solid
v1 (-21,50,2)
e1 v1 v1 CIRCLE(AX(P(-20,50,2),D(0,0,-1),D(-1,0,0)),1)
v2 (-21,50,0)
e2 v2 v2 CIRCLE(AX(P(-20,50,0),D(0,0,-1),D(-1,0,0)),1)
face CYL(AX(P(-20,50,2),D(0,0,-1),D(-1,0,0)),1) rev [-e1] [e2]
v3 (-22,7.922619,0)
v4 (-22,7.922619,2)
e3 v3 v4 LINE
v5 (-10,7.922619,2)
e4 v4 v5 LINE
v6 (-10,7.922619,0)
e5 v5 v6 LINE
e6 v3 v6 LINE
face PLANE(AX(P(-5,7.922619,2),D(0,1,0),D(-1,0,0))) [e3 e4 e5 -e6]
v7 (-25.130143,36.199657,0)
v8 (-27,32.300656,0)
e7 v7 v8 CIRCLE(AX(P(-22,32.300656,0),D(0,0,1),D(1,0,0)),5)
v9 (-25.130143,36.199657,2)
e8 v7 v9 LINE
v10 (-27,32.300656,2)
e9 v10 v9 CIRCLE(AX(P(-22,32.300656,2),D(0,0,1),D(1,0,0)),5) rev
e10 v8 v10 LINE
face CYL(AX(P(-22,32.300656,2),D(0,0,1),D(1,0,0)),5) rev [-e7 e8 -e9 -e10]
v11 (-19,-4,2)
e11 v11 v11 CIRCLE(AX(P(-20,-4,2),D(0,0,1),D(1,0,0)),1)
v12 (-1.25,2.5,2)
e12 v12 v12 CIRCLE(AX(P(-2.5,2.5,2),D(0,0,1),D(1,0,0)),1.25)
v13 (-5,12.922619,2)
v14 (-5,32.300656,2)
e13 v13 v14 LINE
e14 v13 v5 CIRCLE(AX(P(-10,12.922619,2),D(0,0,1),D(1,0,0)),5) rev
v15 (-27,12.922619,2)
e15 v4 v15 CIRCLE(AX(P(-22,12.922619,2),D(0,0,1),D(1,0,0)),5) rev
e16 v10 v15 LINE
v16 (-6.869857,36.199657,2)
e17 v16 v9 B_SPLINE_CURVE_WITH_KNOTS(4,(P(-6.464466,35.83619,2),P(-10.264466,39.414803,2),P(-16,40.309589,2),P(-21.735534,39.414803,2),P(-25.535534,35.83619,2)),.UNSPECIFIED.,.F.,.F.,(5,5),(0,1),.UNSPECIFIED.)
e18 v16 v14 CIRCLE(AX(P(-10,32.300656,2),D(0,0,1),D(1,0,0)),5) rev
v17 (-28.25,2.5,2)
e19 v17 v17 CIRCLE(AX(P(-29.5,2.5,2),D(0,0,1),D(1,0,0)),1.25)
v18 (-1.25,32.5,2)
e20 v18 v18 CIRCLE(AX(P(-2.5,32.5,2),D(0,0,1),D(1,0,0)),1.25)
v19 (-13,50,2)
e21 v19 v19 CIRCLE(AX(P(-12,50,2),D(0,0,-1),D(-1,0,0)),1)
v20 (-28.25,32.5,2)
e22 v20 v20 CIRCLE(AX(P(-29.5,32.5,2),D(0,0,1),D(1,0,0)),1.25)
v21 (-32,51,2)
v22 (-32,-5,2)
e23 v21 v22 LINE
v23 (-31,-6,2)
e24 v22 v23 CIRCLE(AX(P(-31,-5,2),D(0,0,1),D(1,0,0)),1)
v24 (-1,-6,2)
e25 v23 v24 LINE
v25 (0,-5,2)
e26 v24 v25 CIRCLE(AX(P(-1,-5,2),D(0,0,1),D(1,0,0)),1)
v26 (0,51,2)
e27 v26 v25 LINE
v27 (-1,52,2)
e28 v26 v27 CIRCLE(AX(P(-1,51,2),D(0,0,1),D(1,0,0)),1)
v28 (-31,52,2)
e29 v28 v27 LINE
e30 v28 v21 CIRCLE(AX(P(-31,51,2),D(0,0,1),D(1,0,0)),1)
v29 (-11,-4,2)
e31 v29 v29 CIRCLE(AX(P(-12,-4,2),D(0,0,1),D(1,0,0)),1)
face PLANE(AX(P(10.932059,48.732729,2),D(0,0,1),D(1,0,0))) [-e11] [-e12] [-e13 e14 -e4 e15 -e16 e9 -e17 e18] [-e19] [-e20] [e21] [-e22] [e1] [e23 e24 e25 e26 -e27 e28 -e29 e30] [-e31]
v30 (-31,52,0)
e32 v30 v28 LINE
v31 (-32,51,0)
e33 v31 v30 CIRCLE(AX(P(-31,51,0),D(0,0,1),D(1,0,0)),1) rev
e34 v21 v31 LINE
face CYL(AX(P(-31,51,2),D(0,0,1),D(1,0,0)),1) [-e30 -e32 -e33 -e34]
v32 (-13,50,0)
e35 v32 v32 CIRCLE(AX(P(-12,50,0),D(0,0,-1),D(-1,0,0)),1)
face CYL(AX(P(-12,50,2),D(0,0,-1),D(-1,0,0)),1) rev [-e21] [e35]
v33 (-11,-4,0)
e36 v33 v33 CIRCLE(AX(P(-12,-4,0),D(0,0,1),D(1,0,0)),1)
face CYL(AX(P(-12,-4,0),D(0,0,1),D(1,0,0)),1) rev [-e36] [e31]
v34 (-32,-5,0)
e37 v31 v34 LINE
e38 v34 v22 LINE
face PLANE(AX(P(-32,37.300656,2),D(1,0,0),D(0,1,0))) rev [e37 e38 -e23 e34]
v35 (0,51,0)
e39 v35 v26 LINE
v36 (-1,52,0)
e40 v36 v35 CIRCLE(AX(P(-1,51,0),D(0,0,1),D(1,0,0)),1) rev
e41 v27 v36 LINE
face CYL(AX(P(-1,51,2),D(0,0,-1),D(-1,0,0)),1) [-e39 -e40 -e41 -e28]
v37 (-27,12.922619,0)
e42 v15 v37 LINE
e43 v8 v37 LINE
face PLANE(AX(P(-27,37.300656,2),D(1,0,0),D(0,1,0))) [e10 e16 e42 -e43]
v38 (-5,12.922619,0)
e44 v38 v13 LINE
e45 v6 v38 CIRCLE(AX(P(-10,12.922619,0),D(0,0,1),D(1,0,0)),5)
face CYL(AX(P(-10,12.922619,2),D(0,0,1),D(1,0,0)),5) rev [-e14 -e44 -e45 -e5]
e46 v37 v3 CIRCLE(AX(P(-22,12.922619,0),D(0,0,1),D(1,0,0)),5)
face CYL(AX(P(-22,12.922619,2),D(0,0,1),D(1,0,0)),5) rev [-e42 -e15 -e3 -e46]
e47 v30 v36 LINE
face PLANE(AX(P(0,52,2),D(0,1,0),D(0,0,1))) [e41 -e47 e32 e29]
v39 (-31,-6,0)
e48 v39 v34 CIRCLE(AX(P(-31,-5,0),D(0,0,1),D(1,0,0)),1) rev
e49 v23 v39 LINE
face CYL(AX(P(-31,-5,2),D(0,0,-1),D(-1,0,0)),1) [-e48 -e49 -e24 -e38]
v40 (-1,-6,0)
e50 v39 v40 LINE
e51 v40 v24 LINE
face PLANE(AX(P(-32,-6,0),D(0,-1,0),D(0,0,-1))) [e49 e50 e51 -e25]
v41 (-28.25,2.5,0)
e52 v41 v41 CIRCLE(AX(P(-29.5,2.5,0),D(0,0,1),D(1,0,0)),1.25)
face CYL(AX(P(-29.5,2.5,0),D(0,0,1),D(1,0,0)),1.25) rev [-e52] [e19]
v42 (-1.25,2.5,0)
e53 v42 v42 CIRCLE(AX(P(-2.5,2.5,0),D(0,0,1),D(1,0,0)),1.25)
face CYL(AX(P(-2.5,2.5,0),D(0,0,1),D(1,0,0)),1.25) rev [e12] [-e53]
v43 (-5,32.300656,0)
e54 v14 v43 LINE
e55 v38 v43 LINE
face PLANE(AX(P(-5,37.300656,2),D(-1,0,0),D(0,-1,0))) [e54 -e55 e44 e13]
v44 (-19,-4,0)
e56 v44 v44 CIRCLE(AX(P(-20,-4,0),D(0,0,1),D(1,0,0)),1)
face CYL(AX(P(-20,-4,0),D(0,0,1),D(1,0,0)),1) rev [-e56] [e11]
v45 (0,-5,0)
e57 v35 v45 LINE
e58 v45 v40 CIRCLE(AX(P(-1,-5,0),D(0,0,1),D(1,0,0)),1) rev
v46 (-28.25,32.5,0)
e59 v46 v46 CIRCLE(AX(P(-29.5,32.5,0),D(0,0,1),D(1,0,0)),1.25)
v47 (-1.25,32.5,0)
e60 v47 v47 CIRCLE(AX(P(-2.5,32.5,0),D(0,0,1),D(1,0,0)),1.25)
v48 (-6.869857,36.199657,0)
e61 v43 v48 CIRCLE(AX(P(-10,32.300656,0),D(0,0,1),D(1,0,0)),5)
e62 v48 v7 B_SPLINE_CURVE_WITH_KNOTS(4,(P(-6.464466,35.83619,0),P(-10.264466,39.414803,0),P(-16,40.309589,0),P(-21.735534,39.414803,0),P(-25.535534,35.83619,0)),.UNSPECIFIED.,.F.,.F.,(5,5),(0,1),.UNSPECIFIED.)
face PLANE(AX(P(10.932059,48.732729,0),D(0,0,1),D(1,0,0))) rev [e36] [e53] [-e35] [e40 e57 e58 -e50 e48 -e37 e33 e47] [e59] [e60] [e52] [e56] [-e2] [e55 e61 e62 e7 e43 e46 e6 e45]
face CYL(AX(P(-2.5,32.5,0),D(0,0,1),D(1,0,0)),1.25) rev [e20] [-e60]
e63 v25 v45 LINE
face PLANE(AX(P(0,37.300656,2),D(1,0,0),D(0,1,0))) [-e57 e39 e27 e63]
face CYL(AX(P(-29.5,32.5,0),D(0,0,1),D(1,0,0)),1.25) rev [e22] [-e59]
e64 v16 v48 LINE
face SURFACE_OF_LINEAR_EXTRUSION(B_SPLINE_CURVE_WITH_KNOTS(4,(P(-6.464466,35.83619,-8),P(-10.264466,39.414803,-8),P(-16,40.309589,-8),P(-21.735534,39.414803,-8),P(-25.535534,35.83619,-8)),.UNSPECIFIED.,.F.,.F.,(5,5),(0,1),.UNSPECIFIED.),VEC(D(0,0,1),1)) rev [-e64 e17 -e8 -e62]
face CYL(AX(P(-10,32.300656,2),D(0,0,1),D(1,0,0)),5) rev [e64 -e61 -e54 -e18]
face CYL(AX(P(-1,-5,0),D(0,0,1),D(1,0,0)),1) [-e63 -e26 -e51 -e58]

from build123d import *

# Parameters (mm, degrees)
EXTRUDE_1_OUTLINE_W  = 22
EXTRUDE_1_OUTLINE_H  = 29.37803775
EXTRUDE_1_DEPTH      = 2
FILLET_2_R           = 5
FILLET_3_R           = 5
FILLET_4_R           = 5
FILLET_5_DEPTH       = 2
FILLET_6_R           = 5
FILLET_7_R           = 5
SKETCH_4_R           = 1.25
CUT_EXTRUDE_1_DEPTH  = 2
SKETCH_5_R           = 1
CUT_EXTRUDE_3_DEPTH  = 10
CUT_EXTRUDE_4_DEPTH  = 10
EXTRUDE_3_DEPTH      = 2
SKETCH_8_R           = 1
CUT_EXTRUDE_5_DEPTH  = 2
SKETCH_9_W           = 4.328082866
SKETCH_9_H           = 16.646472559
EXTRUDE_5_DEPTH      = 2
SKETCH_11_R          = 1
CUT_EXTRUDE_6_DEPTH  = 2
SKETCH_14_W          = 35.331907889
SKETCH_14_H          = 71.069334822
CUT_EXTRUDE_7_DEPTH  = 10
SKETCH_15_W          = 33.93252641
SKETCH_15_H          = 4.378984323
EXTRUDE_6_DEPTH      = 2
SKETCH_16_W          = 33.760249026
SKETCH_16_H          = 7.770173485
CUT_EXTRUDE_9_DEPTH  = 2
CUT_EXTRUDE_10_DEPTH = 2
FILLET_8_R           = 5
EXTRUDE_START        = -2
EXTRUDE_7_DEPTH      = 2
EXTRUDE_8_DEPTH      = 2
SKETCH_20_W          = 32.150509504
SKETCH_20_H          = 6.514442596
CUT_EXTRUDE_11_DEPTH = 2
FILLET_9_R           = 5
SKETCH_23_R          = 1.25
CUT_EXTRUDE_12_DEPTH = 2
SKETCH_24_R          = 1.25
CUT_EXTRUDE_13_DEPTH = 10
CUT_EXTRUDE_14_DEPTH = 10
CUT_EXTRUDE_START    = -10
CUT_EXTRUDE_15_DEPTH = 10
SKETCH_28_R          = 1
EXTRUDE_10_DEPTH     = 2
SKETCH_29_W          = 32
SKETCH_29_H          = 4
SKETCH_29_R          = 1
EXTRUDE_11_DEPTH     = 2
SKETCH_31_R          = 1
CUT_EXTRUDE_17_DEPTH = 2
SKETCH_32_R          = 1
EXTRUDE_15_DEPTH     = 2
SKETCH_33_R          = 1
CUT_EXTRUDE_18_DEPTH = 2
SKETCH_35_R          = 1
EXTRUDE_16_DEPTH     = 2
SKETCH_36_W          = 32
SKETCH_36_H          = 2
EXTRUDE_17_DEPTH     = 2
SKETCH_37_R          = 1
EXTRUDE_19_DEPTH     = 2
SKETCH_38_R          = 1
CUT_EXTRUDE_21_DEPTH = 2
SKETCH_39_R          = 1
SKETCH_39_W          = 32
SKETCH_39_H          = 2
EXTRUDE_21_DEPTH     = 2
SKETCH_41_R          = 1
CUT_EXTRUDE_22_DEPTH = 2
FILLET_10_R          = 1


with BuildPart() as part:
    # 填料-伸長1: read off the stored shape, not the designer's step
    # 填料-伸長1 outline → 填料-伸長1 (new body)
    with BuildSketch(Plane.XY):
        with BuildLine():
            add(Edge.make_bspline(
                [(-32, 0), (-17.903811151, 0), (-12.226895644, -2.15390634), (-4.846905484, -2.579675003), (1.255778686, -1.586214789), (6.648848418, -2.437752115), (10.054997723, -2.228718788), (26.130584508, 3.269137633), (32.041733308, 41.295248118), (28.788818897, 71.787918144), (16.157681893, 46.951412799), (8.635768846, 50.925253654), (9.345383285, 39.571422639), (-5.414597035, 46), (-17.761888263, 46), (-32, 46)],
                knots=[0, 0, 0, 0, 0, 0, 0, 0, 0, 1, 1, 1, 1, 1, 1, 1, 1.916713019, 1.916713019, 1.916713019, 1.916713019, 1.916713019, 1.916713019, 1.916713019, 1.916713019, 1.916713019], degree=8))
            Line((-32, 46), (-37.468647548, 46))
            Line((-37.468647548, 46), (-37.468647548, 37.300656436))
            Line((-37.468647548, 37.300656436), (-32, 37.300656436))
            Line((-32, 37.300656436), (-32, 7.922618686))
            Line((-32, 7.922618686), (-37.468647548, 7.922618686))
            Line((-37.468647548, 7.922618686), (-37.468647548, 0))
            Line((-37.468647548, 0), (-32, 0))
        make_face()
        with Locations((-16, 22.611637561)):
            Rectangle(EXTRUDE_1_OUTLINE_W, EXTRUDE_1_OUTLINE_H, mode=Mode.SUBTRACT)
        Polygon((0, 37.300656436), (18.937237107, 37.300656436), (18.937237107, 17.573375048), (6.731868766, 7.922618686), (0, 7.922618686), align=None, mode=Mode.SUBTRACT)
    extrude(amount=EXTRUDE_1_DEPTH)

    # 圓角2
    fillet_2_edges = [part.edges().sort_by_distance(p)[0] for p in [
        (18.937237107, 37.300656436, 1),
    ]]
    fillet(fillet_2_edges, radius=FILLET_2_R)

    # 圓角3
    fillet_3_edges = [part.edges().sort_by_distance(p)[0] for p in [
        (18.937237107, 17.573375048, 1),
    ]]
    fillet(fillet_3_edges, radius=FILLET_3_R)

    # 圓角4
    fillet_4_edges = [part.edges().sort_by_distance(p)[0] for p in [
        (6.731868766, 7.922618686, 1),
    ]]
    fillet(fillet_4_edges, radius=FILLET_4_R)

    # 圓角5: read off the stored shape, not the designer's step
    # 圓角5 outline → 圓角5 (add)
    with BuildSketch(Plane.XY):
        with BuildLine():
            Line((0, 7.922618686), (4.993945193, 7.922618686))
            ThreePointArc((4.993945193, 7.922618686), (1.462326044, 9.38922246), (0, 12.92261502))
            Line((0, 12.92261502), (0, 7.922618686))
        make_face()
    extrude(amount=FILLET_5_DEPTH)

    # 圓角6
    fillet_6_edges = [part.edges().sort_by_distance(p)[0] for p in [
        (0, 37.300656436, 1),
        (-5, 7.922618686, 1),
        (-5, 37.300656436, 1),
        (-27, 37.300656436, 1),
        (-27, 7.922618686, 1),
    ]]
    fillet(fillet_6_edges, radius=FILLET_6_R)

    # 圓角7
    fillet_7_edges = [part.edges().sort_by_distance(p)[0] for p in [
        (-32, 7.922618686, 1),
        (-32, 37.300656436, 1),
    ]]
    fillet(fillet_7_edges, radius=FILLET_7_R)

    # 草圖4 → 除料-伸長1 (cut)
    with BuildSketch(Plane.XY.offset(2)):
        with Locations((-2.5, 32.5)):
            Circle(SKETCH_4_R)
        with Locations((-2.5, 2.5)):
            Circle(SKETCH_4_R)
        with Locations((-29.5, 2.5)):
            Circle(SKETCH_4_R)
        with Locations((-29.5, 32.5)):
            Circle(SKETCH_4_R)
    extrude(amount=-CUT_EXTRUDE_1_DEPTH, mode=Mode.SUBTRACT)

    # 草圖5 → 除料-伸長3 (cut)
    with BuildSketch(Plane.XY.offset(2)):
        with Locations((15.768736936, 44.547982454)):
            Circle(SKETCH_5_R)
        with Locations((21.425591185, 38.891128205)):
            Circle(SKETCH_5_R)
        with Locations((18.503337652, 13.912131705)):
            Circle(SKETCH_5_R)
        with Locations((12.846483402, 8.255277455)):
            Circle(SKETCH_5_R)
    extrude(amount=-CUT_EXTRUDE_3_DEPTH, mode=Mode.SUBTRACT)

    # 草圖6 → 除料-伸長4 (cut)
    with BuildSketch(Plane.XY.offset(2)):
        with BuildLine():
            Line((-25.535533906, 35.836190342), (-6.464466094, 35.836190342))
            add(Edge.make_bspline(
                [(-25.535533906, 35.836190342), (-21.735533906, 39.414802563), (-16, 40.309589175), (-10.264466094, 39.414802563), (-6.464466094, 35.836190342)],
                knots=[0, 0, 0, 0, 0, 1, 1, 1, 1, 1], degree=4))
        make_face()
    extrude(amount=-CUT_EXTRUDE_4_DEPTH, mode=Mode.SUBTRACT)

    # 草圖7 → 填料-伸長3 (add)
    with BuildSketch(Plane.XY.offset(2)):
        with BuildLine():
            Line((-32.468647548, 37.300656436), (-38.802161961, 37.300656436))
            ThreePointArc((-38.802161961, 37.300656436), (-42.337695867, 35.836190342), (-43.802161961, 32.300656436))
            Line((-43.802161961, 32.300656436), (-43.802161961, 12.922618686))
            ThreePointArc((-43.802161961, 12.922618686), (-42.337695867, 9.38708478), (-38.802161961, 7.922618686))
            Line((-38.802161961, 7.922618686), (-32.468647548, 7.922618686))
            Line((-32.468647548, 7.922618686), (-32.468647548, 0))
            Line((-32.468647548, 0), (-38.802161961, 0))
            Line((-38.802161961, 0), (-43.802161961, 0))
            Line((-43.802161961, 0), (-49.941860706, 0))
            Line((-49.941860706, 0), (-49.941860706, 46))
            Line((-49.941860706, 46), (-45.941860706, 46))
            Line((-45.941860706, 46), (-38.802161961, 46))
            Line((-38.802161961, 46), (-32.468647548, 46))
            Line((-32.468647548, 46), (-32.468647548, 37.300656436))
        make_face()
    extrude(amount=-EXTRUDE_3_DEPTH)

    # 草圖8 → 除料-伸長5 (cut)
    with BuildSketch(Plane.XY.offset(2)):
        with Locations((-46.872011333, 27)):
            Circle(SKETCH_8_R)
        with Locations((-46.872011333, 19)):
            Circle(SKETCH_8_R)
    extrude(amount=-CUT_EXTRUDE_5_DEPTH, mode=Mode.SUBTRACT)

    # 草圖9 → 填料-伸長5 (add)
    with BuildSketch(Plane.XY.offset(2)):
        with Locations((-46.861716305, 22.916170807)):
            Rectangle(SKETCH_9_W, SKETCH_9_H)
    extrude(amount=-EXTRUDE_5_DEPTH)

    # 草圖11 → 除料-伸長6 (cut)
    with BuildSketch(Plane.XY.offset(2)):
        with Locations((-47.941860706, 27)):
            Circle(SKETCH_11_R)
        with Locations((-47.941860706, 19)):
            Circle(SKETCH_11_R)
    extrude(amount=-CUT_EXTRUDE_6_DEPTH, mode=Mode.SUBTRACT)

    # 草圖14 → 除料-伸長7 (cut)
    with BuildSketch(Plane(origin=(0, 0, 0), x_dir=(-1, 0, 0), z_dir=(0, 0, -1))):
        with Locations((-17.665953945, 27.656712391)):
            Rectangle(SKETCH_14_W, SKETCH_14_H)
    extrude(amount=-CUT_EXTRUDE_7_DEPTH, mode=Mode.SUBTRACT)

    # 草圖15 → 填料-伸長6 (add)
    with BuildSketch(Plane(origin=(0, 0, 0), x_dir=(-1, 0, 0), z_dir=(0, 0, -1))):
        with Locations((16.966263205, 43.810507839)):
            Rectangle(SKETCH_15_W, SKETCH_15_H)
    extrude(amount=-EXTRUDE_6_DEPTH)

    # 草圖16 → 除料-伸長9 (cut)
    with BuildSketch(Plane(origin=(0, 0, 0), x_dir=(-1, 0, 0), z_dir=(0, 0, -1))):
        with Locations((16.880124513, -3.885086743)):
            Rectangle(SKETCH_16_W, SKETCH_16_H)
    extrude(amount=-CUT_EXTRUDE_9_DEPTH, mode=Mode.SUBTRACT)

    # 草圖17 → 除料-伸長10 (cut)
    with BuildSketch(Plane.XY.offset(2)):
        with BuildLine():
            Line((-5.416994756, 46), (0, 46))
            Line((0, 46), (0, 34))
            ThreePointArc((0, 34), (-1.416994756, 40.583005244), (-5.416994756, 46))
        make_face()
    extrude(amount=-CUT_EXTRUDE_10_DEPTH, mode=Mode.SUBTRACT)

    # 圓角8
    fillet_8_edges = [part.edges().sort_by_distance(p)[0] for p in [
        (-49.941860706, 46, 1),
        (-49.941860706, 0, 1),
    ]]
    fillet(fillet_8_edges, radius=FILLET_8_R)

    # 填料-伸長7: read off the stored shape, not the designer's step
    # 填料-伸長7 outline → 填料-伸長7 (add)
    with BuildSketch(Plane.XY.offset(2).offset(EXTRUDE_START)):
        with BuildLine():
            ThreePointArc((-49.941860706, -4.227169739), (-48.36025598, -7.876063738), (-44.616051215, -9.216523212))
            add(Edge.make_bspline(
                [(-44.616051215, -9.216523212), (-33.742886609, -9.216523212), (-25.346473604, -9.216523212), (-23.751624206, -9.216523212), (-22.145120862, -8.325283843), (-15.674190509, 0)],
                knots=[0, 0, 0, 0, 0, 0, 1, 1, 1, 1, 1, 1], degree=5))
            Line((-15.674190509, 0), (-44.941860706, 0))
            ThreePointArc((-44.941860706, 0), (-48.477394612, 1.464466094), (-49.941860706, 5))
            Line((-49.941860706, 5), (-49.941860706, -4.227169739))
        make_face()
    extrude(amount=EXTRUDE_7_DEPTH)

    # 填料-伸長8: read off the stored shape, not the designer's step
    # 填料-伸長8 outline → 填料-伸長8 (add)
    with BuildSketch(Plane.XY.offset(2).offset(EXTRUDE_START)):
        with BuildLine():
            Line((-44.941860706, 46), (-5.416994756, 46))
            add(Edge.make_bspline(
                [(-5.416994756, 46), (-5.995214333, 46.509941735), (-8.96505883, 47.689704563), (-13.043339364, 49.589177689), (-19.132826738, 50.371313682), (-34.255378163, 50.371313682), (-40.342930342, 50.371313682)],
                knots=[0, 0, 0, 0, 0, 0, 0, 1, 1, 1, 1, 1, 1, 1], degree=6))
            Line((-40.342930342, 50.371313682), (-44.941860706, 50.371313682))
            ThreePointArc((-44.941860706, 50.371313682), (-48.477394612, 48.906847588), (-49.941860706, 45.371313682))
            Line((-49.941860706, 45.371313682), (-49.941860706, 41))
            ThreePointArc((-49.941860706, 41), (-48.477394612, 44.535533906), (-44.941860706, 46))
        make_face()
    extrude(amount=EXTRUDE_8_DEPTH)

    # 草圖20 → 除料-伸長11 (cut)
    with BuildSketch(Plane.XY.offset(2)):
        with Locations((-33.866605954, -7.484391037)):
            Rectangle(SKETCH_20_W, SKETCH_20_H)
    extrude(amount=-CUT_EXTRUDE_11_DEPTH, mode=Mode.SUBTRACT)

    # 圓角9
    fillet_9_edges = [part.edges().sort_by_distance(p)[0] for p in [
        (-49.941860706, -4.227169739, 1),
        (-19.111361456, -4.227169739, 1),
        (-15.674190509, 0, 1),
    ]]
    fillet(fillet_9_edges, radius=FILLET_9_R)

    # 草圖23 → 除料-伸長12 (cut)
    with BuildSketch(Plane(origin=(0, 0, 0), x_dir=(-1, 0, 0), z_dir=(0, 0, -1))):
        with Locations((46.883721416, 2.5)):
            Circle(SKETCH_23_R)
    extrude(amount=-CUT_EXTRUDE_12_DEPTH, mode=Mode.SUBTRACT)

    # 草圖24 → 除料-伸長13 (cut)
    with BuildSketch(Plane(origin=(0, 0, 0), x_dir=(-1, 0, 0), z_dir=(0, 0, -1))):
        with Locations((46.883721416, 40.144143942)):
            Circle(SKETCH_24_R)
        with Locations((36.499999996, 40.144143942)):
            Circle(SKETCH_24_R)
    extrude(amount=-CUT_EXTRUDE_13_DEPTH, mode=Mode.SUBTRACT)

    # 草圖25 → 除料-伸長14 (cut)
    with BuildSketch(Plane(origin=(0, 0, 0), x_dir=(-1, 0, 0), z_dir=(0, 0, -1))):
        Polygon((5.416994756, 46), (32, 46), (32, 32.300656436), (32, 0), (0, 0), (0, -4.227169739), (49.941860706, -4.227169739), (49.941860706, 50.371313682), (5.416994756, 50.371313682), align=None)
    extrude(amount=-CUT_EXTRUDE_14_DEPTH, mode=Mode.SUBTRACT)

    # 草圖26 → 除料-伸長15 (cut)
    with BuildSketch(Plane(origin=(0, 0, 0), x_dir=(-1, 0, 0), z_dir=(0, 0, -1)).offset(CUT_EXTRUDE_START)):
        with BuildLine():
            Line((26.583005244, 46), (32, 46))
            Line((32, 46), (32, 34))
            ThreePointArc((32, 34), (30.583005244, 40.583005244), (26.583005244, 46))
        make_face()
    extrude(amount=CUT_EXTRUDE_15_DEPTH, mode=Mode.SUBTRACT)

    # 草圖28 → 填料-伸長10 (add)
    with BuildSketch(Plane(origin=(0, 0, 0), x_dir=(-1, 0, 0), z_dir=(0, 0, -1)).offset(EXTRUDE_START)):
        with BuildLine():
            Line((0, 34), (0, 50))
            Line((0, 50), (32, 50))
            Line((32, 50), (32, 34))
            ThreePointArc((32, 34), (30.583005244, 40.583005244), (26.583005244, 46))
            Line((26.583005244, 46), (5.416994756, 46))
            ThreePointArc((5.416994756, 46), (1.416994756, 40.583005244), (0, 34))
        make_face()
        with Locations((16, 48)):
            Circle(SKETCH_28_R, mode=Mode.SUBTRACT)
    extrude(amount=EXTRUDE_10_DEPTH)

    # 草圖29 → 填料-伸長11 (add)
    with BuildSketch(Plane(origin=(0, 0, 0), x_dir=(-1, 0, 0), z_dir=(0, 0, -1))):
        with Locations((16, -2)):
            Rectangle(SKETCH_29_W, SKETCH_29_H)
        with Locations((16, -2)):
            Circle(SKETCH_29_R, mode=Mode.SUBTRACT)
    extrude(amount=-EXTRUDE_11_DEPTH)

    # 草圖31 → 除料-伸長17 (cut)
    with BuildSketch(Plane(origin=(0, 0, 0), x_dir=(-1, 0, 0), z_dir=(0, 0, -1))):
        with Locations((12, 48)):
            Circle(SKETCH_31_R)
        with Locations((20, 48)):
            Circle(SKETCH_31_R)
    extrude(amount=-CUT_EXTRUDE_17_DEPTH, mode=Mode.SUBTRACT)

    # 草圖32 → 填料-伸長15 (add)
    with BuildSketch(Plane(origin=(0, 0, 0), x_dir=(-1, 0, 0), z_dir=(0, 0, -1)).offset(EXTRUDE_START)):
        with Locations((16, 48)):
            Circle(SKETCH_32_R)
    extrude(amount=EXTRUDE_15_DEPTH)

    # 草圖33 → 除料-伸長18 (cut)
    with BuildSketch(Plane(origin=(0, 0, 0), x_dir=(-1, 0, 0), z_dir=(0, 0, -1))):
        with Locations((12, -2)):
            Circle(SKETCH_33_R)
        with Locations((20, -2)):
            Circle(SKETCH_33_R)
    extrude(amount=-CUT_EXTRUDE_18_DEPTH, mode=Mode.SUBTRACT)

    # 草圖35 → 填料-伸長16 (add)
    with BuildSketch(Plane(origin=(0, 0, 0), x_dir=(-1, 0, 0), z_dir=(0, 0, -1))):
        with Locations((16, -2)):
            Circle(SKETCH_35_R)
    extrude(amount=-EXTRUDE_16_DEPTH)

    # 草圖36 → 填料-伸長17 (add)
    with BuildSketch(Plane(origin=(0, 0, 0), x_dir=(-1, 0, 0), z_dir=(0, 0, -1))):
        with Locations((16, 51)):
            Rectangle(SKETCH_36_W, SKETCH_36_H)
    extrude(amount=-EXTRUDE_17_DEPTH)

    # 草圖37 → 填料-伸長19 (add)
    with BuildSketch(Plane(origin=(0, 0, 0), x_dir=(-1, 0, 0), z_dir=(0, 0, -1))):
        with Locations((12, 48)):
            Circle(SKETCH_37_R)
        with Locations((20, 48)):
            Circle(SKETCH_37_R)
    extrude(amount=-EXTRUDE_19_DEPTH)

    # 草圖38 → 除料-伸長21 (cut)
    with BuildSketch(Plane(origin=(0, 0, 0), x_dir=(-1, 0, 0), z_dir=(0, 0, -1))):
        with Locations((12, 50)):
            Circle(SKETCH_38_R)
        with Locations((20, 50)):
            Circle(SKETCH_38_R)
    extrude(amount=-CUT_EXTRUDE_21_DEPTH, mode=Mode.SUBTRACT)

    # 草圖39 → 填料-伸長21 (add)
    with BuildSketch(Plane.XY.offset(2).offset(EXTRUDE_START)):
        with Locations((-20, -2)):
            Circle(SKETCH_39_R)
        with Locations((-12, -2)):
            Circle(SKETCH_39_R)
        with Locations((-16, -5)):
            Rectangle(SKETCH_39_W, SKETCH_39_H)
    extrude(amount=EXTRUDE_21_DEPTH)

    # 草圖41 → 除料-伸長22 (cut)
    with BuildSketch(Plane.XY.offset(2)):
        with Locations((-20, -4)):
            Circle(SKETCH_41_R)
        with Locations((-12, -4)):
            Circle(SKETCH_41_R)
    extrude(amount=-CUT_EXTRUDE_22_DEPTH, mode=Mode.SUBTRACT)

    # 圓角10
    fillet_10_edges = [part.edges().sort_by_distance(p)[0] for p in [
        (0, 52, 1),
        (-32, 52, 1),
        (-32, -6, 1),
        (0, -6, 1),
    ]]
    fillet(fillet_10_edges, radius=FILLET_10_R)


solid = part.part
